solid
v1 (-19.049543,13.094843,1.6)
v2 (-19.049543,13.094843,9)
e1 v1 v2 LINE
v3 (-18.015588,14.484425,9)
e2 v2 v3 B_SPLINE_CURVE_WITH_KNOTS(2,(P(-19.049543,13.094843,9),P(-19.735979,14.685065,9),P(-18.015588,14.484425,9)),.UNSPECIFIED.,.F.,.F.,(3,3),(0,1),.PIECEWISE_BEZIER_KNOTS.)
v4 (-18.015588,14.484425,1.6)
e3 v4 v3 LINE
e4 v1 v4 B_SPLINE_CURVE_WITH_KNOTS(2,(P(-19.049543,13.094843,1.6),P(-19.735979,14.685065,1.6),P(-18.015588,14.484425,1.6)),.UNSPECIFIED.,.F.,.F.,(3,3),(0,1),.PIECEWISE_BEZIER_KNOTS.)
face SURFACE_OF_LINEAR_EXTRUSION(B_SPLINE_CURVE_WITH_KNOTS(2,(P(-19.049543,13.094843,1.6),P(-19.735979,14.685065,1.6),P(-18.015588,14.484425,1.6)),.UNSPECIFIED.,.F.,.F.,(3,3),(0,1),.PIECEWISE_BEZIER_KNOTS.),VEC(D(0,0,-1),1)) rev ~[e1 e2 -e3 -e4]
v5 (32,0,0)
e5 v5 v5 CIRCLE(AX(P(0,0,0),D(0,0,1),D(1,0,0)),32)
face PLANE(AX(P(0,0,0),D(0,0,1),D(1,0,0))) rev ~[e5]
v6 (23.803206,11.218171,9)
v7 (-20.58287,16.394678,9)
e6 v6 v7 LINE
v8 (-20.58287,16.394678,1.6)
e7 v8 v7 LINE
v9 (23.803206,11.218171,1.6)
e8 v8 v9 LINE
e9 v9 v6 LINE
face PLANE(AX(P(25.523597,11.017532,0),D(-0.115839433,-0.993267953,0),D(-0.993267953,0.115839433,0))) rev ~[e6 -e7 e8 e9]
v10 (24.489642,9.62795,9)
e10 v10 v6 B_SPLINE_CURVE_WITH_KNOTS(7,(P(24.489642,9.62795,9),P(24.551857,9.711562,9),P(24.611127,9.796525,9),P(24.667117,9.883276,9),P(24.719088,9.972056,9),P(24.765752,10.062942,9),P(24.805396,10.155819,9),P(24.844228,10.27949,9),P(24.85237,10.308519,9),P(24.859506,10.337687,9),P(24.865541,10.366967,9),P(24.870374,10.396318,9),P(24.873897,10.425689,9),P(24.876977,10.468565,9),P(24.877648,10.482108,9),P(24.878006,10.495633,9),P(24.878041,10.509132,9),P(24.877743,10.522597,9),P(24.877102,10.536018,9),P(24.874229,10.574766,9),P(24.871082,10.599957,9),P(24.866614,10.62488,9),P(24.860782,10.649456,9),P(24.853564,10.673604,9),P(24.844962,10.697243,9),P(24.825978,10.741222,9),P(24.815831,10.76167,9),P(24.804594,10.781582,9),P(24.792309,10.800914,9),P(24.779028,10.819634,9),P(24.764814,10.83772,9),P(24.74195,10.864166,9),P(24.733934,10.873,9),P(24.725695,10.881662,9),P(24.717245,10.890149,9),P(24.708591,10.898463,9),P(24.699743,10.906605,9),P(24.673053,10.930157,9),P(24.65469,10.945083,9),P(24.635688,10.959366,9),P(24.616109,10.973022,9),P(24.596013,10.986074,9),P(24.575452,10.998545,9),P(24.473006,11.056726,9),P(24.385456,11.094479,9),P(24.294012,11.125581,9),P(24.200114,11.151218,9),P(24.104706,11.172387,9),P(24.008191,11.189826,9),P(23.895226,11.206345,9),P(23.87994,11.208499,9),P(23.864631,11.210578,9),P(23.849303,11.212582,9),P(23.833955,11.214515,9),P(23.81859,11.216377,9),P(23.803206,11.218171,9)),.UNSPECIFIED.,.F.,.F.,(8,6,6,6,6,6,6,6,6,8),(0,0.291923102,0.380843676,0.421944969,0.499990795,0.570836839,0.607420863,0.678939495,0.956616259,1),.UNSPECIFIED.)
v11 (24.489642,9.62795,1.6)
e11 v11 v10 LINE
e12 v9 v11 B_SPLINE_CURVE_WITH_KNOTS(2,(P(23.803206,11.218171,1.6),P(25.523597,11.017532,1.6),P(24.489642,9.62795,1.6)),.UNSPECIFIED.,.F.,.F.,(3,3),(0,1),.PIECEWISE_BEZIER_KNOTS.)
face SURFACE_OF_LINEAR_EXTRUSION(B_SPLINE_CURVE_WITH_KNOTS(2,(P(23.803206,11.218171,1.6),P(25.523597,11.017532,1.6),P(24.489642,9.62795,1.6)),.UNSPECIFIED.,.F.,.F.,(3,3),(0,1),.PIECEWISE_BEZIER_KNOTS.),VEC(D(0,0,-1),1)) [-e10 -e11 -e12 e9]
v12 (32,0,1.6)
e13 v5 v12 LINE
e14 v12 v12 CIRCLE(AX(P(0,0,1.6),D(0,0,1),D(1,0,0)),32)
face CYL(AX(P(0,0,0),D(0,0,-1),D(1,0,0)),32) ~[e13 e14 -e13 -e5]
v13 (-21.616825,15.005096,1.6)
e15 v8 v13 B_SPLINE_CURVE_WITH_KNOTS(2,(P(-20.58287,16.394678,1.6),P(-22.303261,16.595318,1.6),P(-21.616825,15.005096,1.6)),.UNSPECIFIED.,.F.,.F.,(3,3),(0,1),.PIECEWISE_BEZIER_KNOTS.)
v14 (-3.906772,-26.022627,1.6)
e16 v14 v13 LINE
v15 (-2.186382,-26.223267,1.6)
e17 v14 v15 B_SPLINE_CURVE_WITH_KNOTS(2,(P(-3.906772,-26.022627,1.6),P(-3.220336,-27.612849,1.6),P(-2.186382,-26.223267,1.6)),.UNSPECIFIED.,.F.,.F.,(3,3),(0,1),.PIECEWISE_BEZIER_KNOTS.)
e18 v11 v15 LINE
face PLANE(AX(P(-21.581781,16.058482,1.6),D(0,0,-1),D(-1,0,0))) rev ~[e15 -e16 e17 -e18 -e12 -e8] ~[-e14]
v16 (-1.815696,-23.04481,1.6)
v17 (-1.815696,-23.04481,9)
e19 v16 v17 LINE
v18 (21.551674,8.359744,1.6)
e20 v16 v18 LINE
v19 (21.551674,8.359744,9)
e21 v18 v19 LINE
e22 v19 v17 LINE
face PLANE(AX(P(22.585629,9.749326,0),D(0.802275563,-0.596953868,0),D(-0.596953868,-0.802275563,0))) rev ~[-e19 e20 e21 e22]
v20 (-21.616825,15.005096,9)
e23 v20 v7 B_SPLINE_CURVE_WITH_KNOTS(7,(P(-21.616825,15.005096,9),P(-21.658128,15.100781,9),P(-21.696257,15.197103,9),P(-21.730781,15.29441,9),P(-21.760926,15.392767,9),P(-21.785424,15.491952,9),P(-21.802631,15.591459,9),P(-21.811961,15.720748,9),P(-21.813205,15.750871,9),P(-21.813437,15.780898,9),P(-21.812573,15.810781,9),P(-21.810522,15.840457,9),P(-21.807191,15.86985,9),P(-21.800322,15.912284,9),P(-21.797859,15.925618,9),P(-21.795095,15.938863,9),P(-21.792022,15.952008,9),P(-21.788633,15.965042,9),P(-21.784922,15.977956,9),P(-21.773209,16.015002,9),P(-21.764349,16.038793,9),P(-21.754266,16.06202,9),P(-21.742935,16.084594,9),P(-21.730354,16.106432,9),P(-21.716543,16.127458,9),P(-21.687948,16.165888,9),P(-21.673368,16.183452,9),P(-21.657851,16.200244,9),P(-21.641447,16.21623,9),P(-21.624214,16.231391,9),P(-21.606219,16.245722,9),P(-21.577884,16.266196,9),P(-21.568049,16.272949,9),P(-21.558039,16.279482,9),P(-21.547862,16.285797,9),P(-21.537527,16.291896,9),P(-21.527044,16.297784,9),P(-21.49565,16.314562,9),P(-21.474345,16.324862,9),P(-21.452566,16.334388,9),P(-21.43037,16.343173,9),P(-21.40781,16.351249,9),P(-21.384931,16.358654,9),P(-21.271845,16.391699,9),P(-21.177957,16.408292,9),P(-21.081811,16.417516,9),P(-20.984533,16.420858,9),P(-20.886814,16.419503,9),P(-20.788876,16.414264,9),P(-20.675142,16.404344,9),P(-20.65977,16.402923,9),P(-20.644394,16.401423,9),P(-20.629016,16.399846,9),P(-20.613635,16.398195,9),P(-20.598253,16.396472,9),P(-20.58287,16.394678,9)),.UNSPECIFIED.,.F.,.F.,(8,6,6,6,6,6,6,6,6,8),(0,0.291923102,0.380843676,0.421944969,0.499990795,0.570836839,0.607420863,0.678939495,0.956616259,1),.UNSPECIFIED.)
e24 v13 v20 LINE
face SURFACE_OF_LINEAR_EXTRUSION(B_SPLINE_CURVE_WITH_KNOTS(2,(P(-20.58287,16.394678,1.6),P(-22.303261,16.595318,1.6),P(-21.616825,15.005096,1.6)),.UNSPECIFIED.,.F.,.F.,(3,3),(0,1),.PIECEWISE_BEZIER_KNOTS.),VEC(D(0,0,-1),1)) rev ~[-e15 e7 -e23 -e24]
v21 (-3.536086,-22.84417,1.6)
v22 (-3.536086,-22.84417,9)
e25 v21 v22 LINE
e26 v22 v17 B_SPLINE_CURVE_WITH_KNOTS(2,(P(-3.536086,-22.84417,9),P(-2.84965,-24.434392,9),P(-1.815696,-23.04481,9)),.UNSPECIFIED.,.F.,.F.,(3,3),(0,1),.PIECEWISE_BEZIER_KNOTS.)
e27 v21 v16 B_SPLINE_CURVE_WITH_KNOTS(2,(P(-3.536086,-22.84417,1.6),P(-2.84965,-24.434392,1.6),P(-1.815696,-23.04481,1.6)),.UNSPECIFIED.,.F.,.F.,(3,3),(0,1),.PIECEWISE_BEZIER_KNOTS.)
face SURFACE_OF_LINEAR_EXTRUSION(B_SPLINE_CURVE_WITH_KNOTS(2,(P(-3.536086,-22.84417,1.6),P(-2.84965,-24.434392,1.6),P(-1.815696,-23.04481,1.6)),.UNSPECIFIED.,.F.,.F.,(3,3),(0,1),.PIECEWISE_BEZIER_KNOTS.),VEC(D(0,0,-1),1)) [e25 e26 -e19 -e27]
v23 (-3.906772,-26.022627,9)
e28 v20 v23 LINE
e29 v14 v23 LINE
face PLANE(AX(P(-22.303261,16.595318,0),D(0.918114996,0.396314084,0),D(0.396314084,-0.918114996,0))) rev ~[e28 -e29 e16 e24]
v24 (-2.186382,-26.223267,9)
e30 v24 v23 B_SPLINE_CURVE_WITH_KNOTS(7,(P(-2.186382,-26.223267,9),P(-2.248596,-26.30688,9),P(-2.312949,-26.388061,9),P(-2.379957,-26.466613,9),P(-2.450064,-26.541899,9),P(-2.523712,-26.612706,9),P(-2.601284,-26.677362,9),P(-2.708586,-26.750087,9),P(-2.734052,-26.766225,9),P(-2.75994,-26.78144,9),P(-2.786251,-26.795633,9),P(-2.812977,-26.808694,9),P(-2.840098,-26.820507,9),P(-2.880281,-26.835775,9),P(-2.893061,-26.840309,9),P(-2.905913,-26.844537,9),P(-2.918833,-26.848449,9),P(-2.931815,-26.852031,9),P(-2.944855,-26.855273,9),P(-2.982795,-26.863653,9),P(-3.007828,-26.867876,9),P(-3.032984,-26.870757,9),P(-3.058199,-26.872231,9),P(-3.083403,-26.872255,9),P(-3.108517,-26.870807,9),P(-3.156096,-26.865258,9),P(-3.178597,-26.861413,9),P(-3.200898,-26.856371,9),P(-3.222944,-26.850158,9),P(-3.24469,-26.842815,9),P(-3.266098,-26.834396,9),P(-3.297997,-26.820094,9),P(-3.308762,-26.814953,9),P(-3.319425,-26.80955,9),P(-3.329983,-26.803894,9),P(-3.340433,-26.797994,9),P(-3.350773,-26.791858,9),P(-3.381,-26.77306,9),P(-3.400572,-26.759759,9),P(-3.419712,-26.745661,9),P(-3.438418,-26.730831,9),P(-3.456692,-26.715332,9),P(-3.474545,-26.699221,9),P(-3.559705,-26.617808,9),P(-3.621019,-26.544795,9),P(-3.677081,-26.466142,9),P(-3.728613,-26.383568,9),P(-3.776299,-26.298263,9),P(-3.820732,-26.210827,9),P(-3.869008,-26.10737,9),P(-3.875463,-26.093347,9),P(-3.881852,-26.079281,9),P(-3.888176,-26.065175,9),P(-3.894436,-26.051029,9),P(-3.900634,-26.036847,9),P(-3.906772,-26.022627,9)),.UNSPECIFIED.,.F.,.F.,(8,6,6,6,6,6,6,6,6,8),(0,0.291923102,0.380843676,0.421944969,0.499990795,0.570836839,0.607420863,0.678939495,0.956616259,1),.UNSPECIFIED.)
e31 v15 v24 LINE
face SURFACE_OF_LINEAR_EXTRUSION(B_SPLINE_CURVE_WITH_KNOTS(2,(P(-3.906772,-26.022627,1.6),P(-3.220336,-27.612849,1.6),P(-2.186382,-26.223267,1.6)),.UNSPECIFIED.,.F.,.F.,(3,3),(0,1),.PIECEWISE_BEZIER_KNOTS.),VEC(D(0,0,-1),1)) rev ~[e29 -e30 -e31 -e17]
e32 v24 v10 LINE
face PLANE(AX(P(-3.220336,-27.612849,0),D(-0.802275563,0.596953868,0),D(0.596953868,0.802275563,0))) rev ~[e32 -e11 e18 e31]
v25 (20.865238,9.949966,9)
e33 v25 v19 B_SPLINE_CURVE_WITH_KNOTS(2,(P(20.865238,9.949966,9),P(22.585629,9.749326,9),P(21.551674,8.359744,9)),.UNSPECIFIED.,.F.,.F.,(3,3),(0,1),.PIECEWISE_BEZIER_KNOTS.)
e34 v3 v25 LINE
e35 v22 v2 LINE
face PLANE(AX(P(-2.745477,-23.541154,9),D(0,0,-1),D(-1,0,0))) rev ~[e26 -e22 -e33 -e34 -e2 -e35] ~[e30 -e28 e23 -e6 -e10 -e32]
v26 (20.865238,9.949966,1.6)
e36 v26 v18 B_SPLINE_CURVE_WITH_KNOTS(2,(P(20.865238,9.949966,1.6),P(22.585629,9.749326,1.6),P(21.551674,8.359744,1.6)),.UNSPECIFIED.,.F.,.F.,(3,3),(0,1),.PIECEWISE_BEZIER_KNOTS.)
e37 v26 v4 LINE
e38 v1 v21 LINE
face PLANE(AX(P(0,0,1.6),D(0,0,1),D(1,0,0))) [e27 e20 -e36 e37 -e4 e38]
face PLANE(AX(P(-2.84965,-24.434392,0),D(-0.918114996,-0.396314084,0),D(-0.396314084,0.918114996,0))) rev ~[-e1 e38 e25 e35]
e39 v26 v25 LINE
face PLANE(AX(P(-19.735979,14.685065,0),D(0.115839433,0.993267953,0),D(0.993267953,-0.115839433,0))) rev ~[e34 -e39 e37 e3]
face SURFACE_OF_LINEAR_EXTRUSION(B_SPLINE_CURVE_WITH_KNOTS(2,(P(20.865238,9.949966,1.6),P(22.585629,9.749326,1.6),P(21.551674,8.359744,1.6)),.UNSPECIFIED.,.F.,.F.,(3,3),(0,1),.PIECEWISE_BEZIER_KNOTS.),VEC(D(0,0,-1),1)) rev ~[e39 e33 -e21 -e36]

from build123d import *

# Parameters (mm, degrees)
F0_R        = 32
F1_DEPTH    = 1.6
F2_DEPTH    = 1.6
F3_DEPTH    = 9
F4_T1_DEPTH = 7.4
F4_T3_DEPTH = 11.7301270189


# Not quite as in the source:
# - a fillet or chamfer that OpenCascade refuses, or shapes differently, is made with other operations: its cross-section is extruded or revolved along the edge and cut away or added


with BuildPart() as f1:
    # F0 (on Top) → F1 (new body)
    with BuildSketch(Plane.XY):
        Circle(F0_R)
        Polygon((-3.2203362492, -27.6128490823), (-22.3032606516, 16.5953175417), (25.5235969007, 11.0175315406), align=None, mode=Mode.SUBTRACT)
        Polygon((25.5235969007, 11.0175315406), (-22.3032606516, 16.5953175417), (-3.2203362492, -27.6128490823), align=None)
        Polygon((-2.8496500622, -24.434391634), (-19.7359788499, 14.6850651628), (22.5856289122, 9.7493264712), align=None, mode=Mode.SUBTRACT)
    extrude(amount=F1_DEPTH)

    # F0 (on Top) → F2 (join)
    with BuildSketch(Plane.XY):
        Polygon((22.5856289122, 9.7493264712), (-19.7359788499, 14.6850651628), (-2.8496500622, -24.434391634), align=None)
    extrude(amount=F2_DEPTH)

    # F0 (on Top) → F3 (join)
    with BuildSketch(Plane.XY):
        Polygon((25.5235969007, 11.0175315406), (-22.3032606516, 16.5953175417), (-3.2203362492, -27.6128490823), align=None)
        Polygon((-2.8496500622, -24.434391634), (-19.7359788499, 14.6850651628), (22.5856289122, 9.7493264712), align=None, mode=Mode.SUBTRACT)
    extrude(amount=F3_DEPTH)

    # F4: fillet of radius 1 on 6 edges, made by hand

    # F4_s2 → F4_t1 (join)
    with BuildSketch(Plane.XY.offset(1.6)):
        with BuildLine():
            add(Edge.make_bspline(
                [(-3.5360861918, -22.844169813), (-2.8496500622, -24.434391634), (-1.8156956324, -23.0448095972)],
                knots=[0, 0, 0, 1, 1, 1], degree=2, weights=[1, 1, 1]))
            Line((-1.8156956324, -23.0448095972), (-2.8496500622, -24.434391634))
            Line((-2.8496500622, -24.434391634), (-3.5360861918, -22.844169813))
        make_face()
        with BuildLine():
            add(Edge.make_bspline(
                [(20.8652383527, 9.9499662554), (22.5856289122, 9.7493264712), (21.5516744823, 8.3597444344)],
                knots=[0, 0, 0, 1, 1, 1], degree=2, weights=[1, 1, 1]))
            Line((21.5516744823, 8.3597444344), (22.5856289122, 9.7493264712))
            Line((22.5856289122, 9.7493264712), (20.8652383527, 9.9499662554))
        make_face()
        with BuildLine():
            add(Edge.make_bspline(
                [(-19.0495427204, 13.0948433418), (-19.7359788499, 14.6850651628), (-18.0155882905, 14.4844253786)],
                knots=[0, 0, 0, 1, 1, 1], degree=2, weights=[1, 1, 1]))
            Line((-18.0155882905, 14.4844253786), (-19.7359788499, 14.6850651628))
            Line((-19.7359788499, 14.6850651628), (-19.0495427204, 13.0948433418))
        make_face()
    extrude(amount=F4_T1_DEPTH)

    # F4_s4 → F4_t3 (cut)
    with BuildSketch(Plane.XY.offset(1.6)):
        with BuildLine():
            add(Edge.make_bspline(
                [(-3.9067723788, -26.0226272613), (-3.2203362492, -27.6128490823), (-2.1863818193, -26.2232670455)],
                knots=[0, 0, 0, 1, 1, 1], degree=2, weights=[1, 1, 1]))
            Line((-2.1863818193, -26.2232670455), (-3.2203362492, -27.6128490823))
            Line((-3.2203362492, -27.6128490823), (-3.9067723788, -26.0226272613))
        make_face()
        with BuildLine():
            add(Edge.make_bspline(
                [(23.8032063413, 11.2181713248), (25.5235969007, 11.0175315406), (24.4896424709, 9.6279495038)],
                knots=[0, 0, 0, 1, 1, 1], degree=2, weights=[1, 1, 1]))
            Line((24.4896424709, 9.6279495038), (25.5235969007, 11.0175315406))
            Line((25.5235969007, 11.0175315406), (23.8032063413, 11.2181713248))
        make_face()
        with BuildLine():
            add(Edge.make_bspline(
                [(-20.5828700921, 16.3946777575), (-22.3032606516, 16.5953175417), (-21.616824522, 15.0050957207)],
                knots=[0, 0, 0, 1, 1, 1], degree=2, weights=[1, 1, 1]))
            Line((-21.616824522, 15.0050957207), (-22.3032606516, 16.5953175417))
            Line((-22.3032606516, 16.5953175417), (-20.5828700921, 16.3946777575))
        make_face()
    extrude(amount=F4_T3_DEPTH, mode=Mode.SUBTRACT)


solid = f1.part
